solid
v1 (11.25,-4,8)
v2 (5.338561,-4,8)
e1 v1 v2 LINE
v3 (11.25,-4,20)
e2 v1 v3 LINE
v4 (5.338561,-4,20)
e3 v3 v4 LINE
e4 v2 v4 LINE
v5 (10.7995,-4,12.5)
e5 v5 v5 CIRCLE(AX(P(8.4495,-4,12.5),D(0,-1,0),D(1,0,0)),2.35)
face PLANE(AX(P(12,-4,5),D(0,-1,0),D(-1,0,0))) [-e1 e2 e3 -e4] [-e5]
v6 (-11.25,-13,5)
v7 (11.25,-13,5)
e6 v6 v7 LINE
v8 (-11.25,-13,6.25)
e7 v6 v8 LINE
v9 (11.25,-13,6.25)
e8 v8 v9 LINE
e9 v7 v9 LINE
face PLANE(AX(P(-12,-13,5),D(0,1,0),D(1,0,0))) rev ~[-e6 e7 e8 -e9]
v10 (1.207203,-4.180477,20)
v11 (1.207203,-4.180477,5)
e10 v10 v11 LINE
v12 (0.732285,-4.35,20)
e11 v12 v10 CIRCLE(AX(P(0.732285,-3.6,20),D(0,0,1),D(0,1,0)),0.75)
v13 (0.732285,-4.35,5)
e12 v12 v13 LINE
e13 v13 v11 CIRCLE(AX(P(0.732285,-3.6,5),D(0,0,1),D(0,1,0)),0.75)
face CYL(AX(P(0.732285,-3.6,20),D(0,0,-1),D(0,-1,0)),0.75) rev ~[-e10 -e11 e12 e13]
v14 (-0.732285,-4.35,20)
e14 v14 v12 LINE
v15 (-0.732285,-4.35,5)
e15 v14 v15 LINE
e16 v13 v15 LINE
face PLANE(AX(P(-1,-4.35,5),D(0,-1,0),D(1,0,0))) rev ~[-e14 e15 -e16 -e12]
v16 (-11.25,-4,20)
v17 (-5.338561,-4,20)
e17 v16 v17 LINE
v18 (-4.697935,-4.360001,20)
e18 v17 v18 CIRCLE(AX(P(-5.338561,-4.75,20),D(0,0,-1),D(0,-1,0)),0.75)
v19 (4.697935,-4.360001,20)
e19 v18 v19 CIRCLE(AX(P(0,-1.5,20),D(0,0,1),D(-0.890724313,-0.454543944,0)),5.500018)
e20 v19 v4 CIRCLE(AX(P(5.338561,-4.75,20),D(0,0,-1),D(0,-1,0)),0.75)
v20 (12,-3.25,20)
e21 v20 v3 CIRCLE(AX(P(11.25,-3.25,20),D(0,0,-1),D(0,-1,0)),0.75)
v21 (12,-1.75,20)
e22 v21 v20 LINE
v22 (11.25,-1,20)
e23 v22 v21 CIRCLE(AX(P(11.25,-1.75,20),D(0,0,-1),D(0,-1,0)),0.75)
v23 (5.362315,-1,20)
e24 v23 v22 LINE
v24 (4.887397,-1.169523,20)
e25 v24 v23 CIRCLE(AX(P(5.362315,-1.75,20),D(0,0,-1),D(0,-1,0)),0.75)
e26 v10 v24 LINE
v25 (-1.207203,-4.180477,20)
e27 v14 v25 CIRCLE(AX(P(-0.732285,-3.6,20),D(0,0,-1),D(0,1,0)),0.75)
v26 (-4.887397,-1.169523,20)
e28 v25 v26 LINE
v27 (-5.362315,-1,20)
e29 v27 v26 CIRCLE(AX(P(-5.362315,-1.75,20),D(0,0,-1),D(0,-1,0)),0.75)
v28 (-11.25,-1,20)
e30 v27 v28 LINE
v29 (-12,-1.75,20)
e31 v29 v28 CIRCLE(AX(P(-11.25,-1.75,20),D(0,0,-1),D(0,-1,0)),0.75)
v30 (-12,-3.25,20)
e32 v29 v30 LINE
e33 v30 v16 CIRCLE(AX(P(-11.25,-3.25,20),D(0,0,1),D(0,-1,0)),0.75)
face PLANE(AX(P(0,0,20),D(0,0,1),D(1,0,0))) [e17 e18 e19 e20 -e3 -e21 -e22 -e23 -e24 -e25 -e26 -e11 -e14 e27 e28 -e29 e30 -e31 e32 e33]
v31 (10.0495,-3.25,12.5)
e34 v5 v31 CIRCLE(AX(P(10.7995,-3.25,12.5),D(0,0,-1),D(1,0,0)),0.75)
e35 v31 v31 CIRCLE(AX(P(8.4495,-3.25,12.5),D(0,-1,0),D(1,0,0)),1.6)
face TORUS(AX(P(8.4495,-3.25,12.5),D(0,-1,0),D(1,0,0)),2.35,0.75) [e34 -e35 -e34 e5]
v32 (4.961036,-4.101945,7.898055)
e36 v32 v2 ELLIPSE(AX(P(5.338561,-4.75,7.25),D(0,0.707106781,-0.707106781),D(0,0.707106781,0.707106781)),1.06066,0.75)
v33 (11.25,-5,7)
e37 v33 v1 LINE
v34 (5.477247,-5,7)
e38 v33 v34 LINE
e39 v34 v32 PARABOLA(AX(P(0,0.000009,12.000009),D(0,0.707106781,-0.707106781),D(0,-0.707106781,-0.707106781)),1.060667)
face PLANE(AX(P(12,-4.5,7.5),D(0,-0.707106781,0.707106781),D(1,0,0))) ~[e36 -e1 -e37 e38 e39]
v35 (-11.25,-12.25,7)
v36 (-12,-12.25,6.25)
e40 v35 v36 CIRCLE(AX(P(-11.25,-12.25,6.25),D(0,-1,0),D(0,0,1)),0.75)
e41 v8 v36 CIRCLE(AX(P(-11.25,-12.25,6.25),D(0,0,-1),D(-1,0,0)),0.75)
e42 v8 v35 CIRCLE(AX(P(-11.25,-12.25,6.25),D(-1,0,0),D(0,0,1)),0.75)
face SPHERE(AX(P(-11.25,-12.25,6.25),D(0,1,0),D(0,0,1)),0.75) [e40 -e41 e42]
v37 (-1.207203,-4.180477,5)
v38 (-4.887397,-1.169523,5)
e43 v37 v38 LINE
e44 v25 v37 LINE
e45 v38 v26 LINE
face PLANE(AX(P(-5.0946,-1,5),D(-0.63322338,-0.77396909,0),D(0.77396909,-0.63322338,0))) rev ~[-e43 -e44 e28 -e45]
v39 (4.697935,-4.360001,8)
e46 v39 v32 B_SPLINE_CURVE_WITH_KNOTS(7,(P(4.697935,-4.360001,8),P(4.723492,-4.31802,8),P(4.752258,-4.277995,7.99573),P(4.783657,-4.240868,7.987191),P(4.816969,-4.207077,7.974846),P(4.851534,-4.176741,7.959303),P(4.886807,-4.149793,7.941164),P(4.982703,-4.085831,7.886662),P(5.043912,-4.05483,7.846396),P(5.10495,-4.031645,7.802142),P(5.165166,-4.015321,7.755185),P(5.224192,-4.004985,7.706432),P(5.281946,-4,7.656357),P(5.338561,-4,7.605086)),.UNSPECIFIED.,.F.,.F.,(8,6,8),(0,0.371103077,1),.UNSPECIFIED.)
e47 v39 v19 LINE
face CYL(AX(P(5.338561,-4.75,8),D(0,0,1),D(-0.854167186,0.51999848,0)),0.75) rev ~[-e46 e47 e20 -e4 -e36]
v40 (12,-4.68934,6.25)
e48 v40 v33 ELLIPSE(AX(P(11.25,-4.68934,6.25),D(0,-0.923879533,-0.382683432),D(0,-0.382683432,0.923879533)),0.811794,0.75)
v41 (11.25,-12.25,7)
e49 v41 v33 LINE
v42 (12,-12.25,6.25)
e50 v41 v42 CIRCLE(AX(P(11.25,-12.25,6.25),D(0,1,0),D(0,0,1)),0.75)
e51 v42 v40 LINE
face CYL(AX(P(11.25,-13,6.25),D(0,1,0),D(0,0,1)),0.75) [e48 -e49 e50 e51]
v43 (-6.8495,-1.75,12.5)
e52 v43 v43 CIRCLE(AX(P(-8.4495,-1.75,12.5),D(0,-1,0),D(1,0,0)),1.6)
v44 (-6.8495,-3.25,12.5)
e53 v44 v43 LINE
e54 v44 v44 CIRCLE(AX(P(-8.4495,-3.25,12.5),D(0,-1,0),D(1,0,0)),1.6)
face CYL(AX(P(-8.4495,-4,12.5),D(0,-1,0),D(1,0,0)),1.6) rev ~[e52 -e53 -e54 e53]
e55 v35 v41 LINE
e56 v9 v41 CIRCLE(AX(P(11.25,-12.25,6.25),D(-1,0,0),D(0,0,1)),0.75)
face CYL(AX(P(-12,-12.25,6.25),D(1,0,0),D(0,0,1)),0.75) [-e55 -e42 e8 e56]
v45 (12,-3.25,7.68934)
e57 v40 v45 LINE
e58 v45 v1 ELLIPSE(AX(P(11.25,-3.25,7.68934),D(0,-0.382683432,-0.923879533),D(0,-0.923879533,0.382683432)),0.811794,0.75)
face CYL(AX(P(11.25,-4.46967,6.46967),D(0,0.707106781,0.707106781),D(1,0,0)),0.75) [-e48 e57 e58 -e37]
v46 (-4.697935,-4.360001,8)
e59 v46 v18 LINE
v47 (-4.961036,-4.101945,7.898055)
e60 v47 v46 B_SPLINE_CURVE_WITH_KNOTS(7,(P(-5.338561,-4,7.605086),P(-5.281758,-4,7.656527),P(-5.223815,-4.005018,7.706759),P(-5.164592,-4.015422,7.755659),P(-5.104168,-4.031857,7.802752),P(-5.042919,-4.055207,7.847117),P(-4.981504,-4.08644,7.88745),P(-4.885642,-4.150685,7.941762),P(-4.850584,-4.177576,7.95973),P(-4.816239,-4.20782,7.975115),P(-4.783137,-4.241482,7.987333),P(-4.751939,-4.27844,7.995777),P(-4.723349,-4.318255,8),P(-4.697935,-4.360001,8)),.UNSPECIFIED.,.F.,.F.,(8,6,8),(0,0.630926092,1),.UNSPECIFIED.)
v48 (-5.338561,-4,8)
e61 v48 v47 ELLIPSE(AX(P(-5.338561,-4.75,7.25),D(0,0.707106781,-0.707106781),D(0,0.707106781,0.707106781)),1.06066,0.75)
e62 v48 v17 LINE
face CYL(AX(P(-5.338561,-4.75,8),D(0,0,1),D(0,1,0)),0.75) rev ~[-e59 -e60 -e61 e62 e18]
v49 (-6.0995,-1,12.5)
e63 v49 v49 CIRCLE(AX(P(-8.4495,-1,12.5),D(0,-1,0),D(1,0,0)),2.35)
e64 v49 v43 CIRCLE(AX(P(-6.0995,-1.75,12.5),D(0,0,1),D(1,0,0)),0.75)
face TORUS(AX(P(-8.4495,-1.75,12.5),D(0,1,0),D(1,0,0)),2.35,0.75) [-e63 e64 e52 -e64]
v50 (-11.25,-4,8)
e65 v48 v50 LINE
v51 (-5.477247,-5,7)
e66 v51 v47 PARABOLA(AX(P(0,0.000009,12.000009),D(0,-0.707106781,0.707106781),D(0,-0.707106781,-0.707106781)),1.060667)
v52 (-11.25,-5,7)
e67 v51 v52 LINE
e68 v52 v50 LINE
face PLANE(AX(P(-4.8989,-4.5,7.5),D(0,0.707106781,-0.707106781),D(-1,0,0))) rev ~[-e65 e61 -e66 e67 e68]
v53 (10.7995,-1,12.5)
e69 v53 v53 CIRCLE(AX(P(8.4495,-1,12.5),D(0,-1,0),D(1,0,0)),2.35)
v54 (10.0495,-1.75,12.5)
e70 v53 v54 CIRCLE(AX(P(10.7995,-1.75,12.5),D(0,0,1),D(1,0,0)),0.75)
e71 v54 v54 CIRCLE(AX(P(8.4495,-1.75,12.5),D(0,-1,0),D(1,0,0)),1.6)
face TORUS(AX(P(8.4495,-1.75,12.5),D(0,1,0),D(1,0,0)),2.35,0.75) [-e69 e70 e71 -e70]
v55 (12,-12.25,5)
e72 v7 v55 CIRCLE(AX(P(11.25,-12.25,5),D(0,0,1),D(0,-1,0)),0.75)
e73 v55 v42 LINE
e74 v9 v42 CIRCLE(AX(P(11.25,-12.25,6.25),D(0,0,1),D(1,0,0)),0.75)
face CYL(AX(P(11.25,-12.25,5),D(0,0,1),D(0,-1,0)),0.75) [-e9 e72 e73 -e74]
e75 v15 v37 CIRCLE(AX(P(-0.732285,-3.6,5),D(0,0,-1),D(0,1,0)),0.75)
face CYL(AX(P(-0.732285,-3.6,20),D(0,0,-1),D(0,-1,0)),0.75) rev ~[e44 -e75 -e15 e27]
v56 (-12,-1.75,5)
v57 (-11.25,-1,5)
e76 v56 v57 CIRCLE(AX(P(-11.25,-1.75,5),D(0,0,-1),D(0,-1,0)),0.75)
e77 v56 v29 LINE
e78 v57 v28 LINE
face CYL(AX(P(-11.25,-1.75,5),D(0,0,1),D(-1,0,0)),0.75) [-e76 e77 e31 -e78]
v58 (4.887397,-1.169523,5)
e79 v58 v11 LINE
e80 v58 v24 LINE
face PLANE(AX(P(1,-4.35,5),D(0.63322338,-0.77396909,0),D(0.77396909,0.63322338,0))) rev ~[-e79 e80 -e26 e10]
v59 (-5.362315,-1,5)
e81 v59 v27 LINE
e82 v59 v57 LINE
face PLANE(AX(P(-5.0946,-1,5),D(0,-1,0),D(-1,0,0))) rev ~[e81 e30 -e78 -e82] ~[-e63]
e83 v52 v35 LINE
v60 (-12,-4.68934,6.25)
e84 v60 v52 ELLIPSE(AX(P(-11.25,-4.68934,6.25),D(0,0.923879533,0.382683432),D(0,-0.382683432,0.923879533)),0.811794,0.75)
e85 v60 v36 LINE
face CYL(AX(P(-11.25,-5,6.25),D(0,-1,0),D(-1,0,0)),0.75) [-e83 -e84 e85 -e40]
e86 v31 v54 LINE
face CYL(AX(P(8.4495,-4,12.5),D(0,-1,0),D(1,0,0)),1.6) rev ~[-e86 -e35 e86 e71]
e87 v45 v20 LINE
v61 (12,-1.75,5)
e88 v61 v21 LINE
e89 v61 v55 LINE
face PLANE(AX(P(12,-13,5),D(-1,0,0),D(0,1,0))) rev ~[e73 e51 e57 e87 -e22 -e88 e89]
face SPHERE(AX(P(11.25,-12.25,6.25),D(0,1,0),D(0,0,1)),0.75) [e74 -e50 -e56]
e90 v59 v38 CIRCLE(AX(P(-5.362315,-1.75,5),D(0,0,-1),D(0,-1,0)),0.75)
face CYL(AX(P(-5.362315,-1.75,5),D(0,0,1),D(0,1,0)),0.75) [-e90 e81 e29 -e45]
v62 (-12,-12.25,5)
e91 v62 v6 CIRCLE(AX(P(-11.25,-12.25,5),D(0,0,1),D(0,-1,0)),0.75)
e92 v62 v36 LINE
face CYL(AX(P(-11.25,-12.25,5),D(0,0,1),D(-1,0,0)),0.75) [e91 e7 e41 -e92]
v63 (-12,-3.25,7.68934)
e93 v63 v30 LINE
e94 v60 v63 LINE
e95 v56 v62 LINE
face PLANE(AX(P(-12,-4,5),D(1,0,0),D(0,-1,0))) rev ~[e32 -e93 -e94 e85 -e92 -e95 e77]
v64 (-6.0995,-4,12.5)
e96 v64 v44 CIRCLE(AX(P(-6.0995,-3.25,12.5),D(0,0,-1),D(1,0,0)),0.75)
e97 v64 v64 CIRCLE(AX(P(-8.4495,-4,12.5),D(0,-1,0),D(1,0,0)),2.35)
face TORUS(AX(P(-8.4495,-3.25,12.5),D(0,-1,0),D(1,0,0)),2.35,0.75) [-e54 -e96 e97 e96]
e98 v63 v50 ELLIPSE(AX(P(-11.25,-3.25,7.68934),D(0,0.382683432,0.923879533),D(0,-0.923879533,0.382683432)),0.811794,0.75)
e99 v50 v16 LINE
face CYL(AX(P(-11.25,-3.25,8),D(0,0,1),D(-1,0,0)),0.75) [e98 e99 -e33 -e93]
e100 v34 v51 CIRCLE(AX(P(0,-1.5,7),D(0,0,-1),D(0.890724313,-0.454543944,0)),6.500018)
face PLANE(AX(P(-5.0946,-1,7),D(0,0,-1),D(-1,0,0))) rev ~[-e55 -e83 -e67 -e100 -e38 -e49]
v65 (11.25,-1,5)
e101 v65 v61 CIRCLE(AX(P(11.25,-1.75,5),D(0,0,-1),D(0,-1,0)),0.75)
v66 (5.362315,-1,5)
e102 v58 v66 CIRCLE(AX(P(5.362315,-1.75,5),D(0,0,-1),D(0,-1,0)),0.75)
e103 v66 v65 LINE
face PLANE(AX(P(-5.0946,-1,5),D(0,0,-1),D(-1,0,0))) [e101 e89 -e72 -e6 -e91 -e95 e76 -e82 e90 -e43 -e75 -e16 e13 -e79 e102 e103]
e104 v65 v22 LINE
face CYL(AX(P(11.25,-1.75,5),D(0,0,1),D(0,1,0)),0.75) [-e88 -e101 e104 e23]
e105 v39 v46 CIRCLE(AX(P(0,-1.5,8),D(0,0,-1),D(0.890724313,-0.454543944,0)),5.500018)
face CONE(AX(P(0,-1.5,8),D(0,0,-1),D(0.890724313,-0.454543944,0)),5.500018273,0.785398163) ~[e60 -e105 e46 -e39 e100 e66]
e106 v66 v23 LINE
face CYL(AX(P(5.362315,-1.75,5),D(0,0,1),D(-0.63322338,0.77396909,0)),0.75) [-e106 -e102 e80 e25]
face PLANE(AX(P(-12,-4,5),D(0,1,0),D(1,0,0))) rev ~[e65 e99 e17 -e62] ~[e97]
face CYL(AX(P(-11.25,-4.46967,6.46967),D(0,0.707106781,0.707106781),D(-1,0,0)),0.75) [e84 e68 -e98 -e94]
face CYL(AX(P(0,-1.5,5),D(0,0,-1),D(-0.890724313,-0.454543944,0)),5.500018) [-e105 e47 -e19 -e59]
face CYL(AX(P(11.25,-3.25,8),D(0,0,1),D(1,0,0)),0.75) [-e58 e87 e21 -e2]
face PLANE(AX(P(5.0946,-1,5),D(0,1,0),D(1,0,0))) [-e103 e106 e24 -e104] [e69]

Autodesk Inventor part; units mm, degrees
ref_plane "YZ Plane" through (0, 0, 0) normal (1, 0, 0) x (0, 1, 0)
ref_plane "XZ Plane" through (0, 0, 0) normal (0, 1, 0) x (-1, 0, 0)
ref_plane "XY Plane" through (0, 0, 0) normal (0, 0, 1) x (1, 0, 0)
sketch "Sketch1" plane through (0, 0, 0) normal (0, 0, 1) x (1, 0, 0)
  line L0 (-10, -12.5) -> (10, -12.5) construction
  line L1 (10, -12.5) -> (10, 12.5) construction
  line L2 (10, 12.5) -> (-10, 12.5) construction
  line L3 (-10, 12.5) -> (-10, -12.5) construction
  line L4 (-10, -12.5) -> (10, 12.5) construction
  line L5 (10, -12.5) -> (-10, 12.5) construction
  circle A0 centre (-10, 12.5) radius 1.925
  circle A1 centre (10, 12.5) radius 1.925
  circle A2 centre (10, -12.5) radius 1.925
  circle A3 centre (-10, -12.5) radius 1.925
  arc A4 (-7.1685, 17.7046) -> (-15.1908, 9.6432) centre (-10, 12.5) ccw
  arc A5 (15.1908, 9.6432) -> (7.1685, 17.7046) centre (10, 12.5) ccw
  arc A6 (7.1685, -17.7046) -> (15.1908, -9.6432) centre (10, -12.5) ccw
  arc A7 (-15.1908, -9.6432) -> (-7.1685, -17.7046) centre (-10, -12.5) ccw
  arc A8 (-7.1685, 17.7046) -> (7.1685, 17.7046) centre (0, 30.8808) ccw
  arc A9 (7.1685, -17.7046) -> (-7.1685, -17.7046) centre (0, -30.8808) ccw
  arc A10 (15.1908, 9.6432) -> (15.1908, -9.6432) centre (32.7125, 0) ccw
  arc A11 (-15.1908, -9.6432) -> (-15.1908, 9.6432) centre (-32.7125, 0) ccw
  point P0 (0, 0)
  dimension "d0" = 25
  dimension "d1" = 20
  dimension "d2" = 3.85
  dimension "d3" = 4
  dimension "d4" = 15
  dimension "d5" = 20
extrude "Extrusion1" add sketch "Sketch1" along normal blind 5
sketch "Sketch2" plane through (0, 0, 5) normal (0, 0, 1) x (1, 0, 0)
  circle A0 centre (0, 0) radius 4 construction
  line L0 (-1, -4.35) -> (1, -4.35)
  line L1 (1, -4.35) -> (5.0946, -1)
  line L2 (5.0946, -1) -> (12, -1)
  line L3 (-1, -4.35) -> (-5.0946, -1)
  line L4 (-5.0946, -1) -> (-12, -1)
  line L5 (0, 0) -> (0, -4.35) construction
  line L6 (-12, -1) -> (-12, -4)
  line L7 (-12, -4) -> (-4.899, -4)
  line L8 (12, -1) -> (12, -4)
  line L9 (12, -4) -> (4.899, -4)
  arc A1 (-4.899, -4) -> (4.899, -4) centre (0, -1.5) ccw
  dimension "d8" = 8
  dimension "d9" = 1
  dimension "d10" = 3
  dimension "d11" = 24
  dimension "d12" = 2
  dimension "d13" = 3.35
  dimension "d14" = 5.5
  dimension "d15" = 2.5
extrude "Extrusion2" add sketch "Sketch2" along normal blind 15
sketch "Sketch3" plane through (4.899, -4, 5) normal (0, -1, 0) x (1, 0, 0)
  line L0 (7.101, 0) -> (0, 0) projected
  line L1 (7.101, 0) -> (7.101, 15) projected
  line L2 (0, 0) -> (0, 15) projected
  circle A0 centre (3.5505, 7.5) radius 1.6
  circle A1 centre (-13.3485, 7.5) radius 1.6
  line L3 (3.5505, 0) -> (3.5505, 7.5) construction
  line L4 (3.5505, 7.5) -> (7.101, 7.5) construction
  line L5 (-16.899, 7.5) -> (-13.3485, 7.5) construction
  line L6 (-13.3485, 7.5) -> (-13.3485, 0) construction
  line L7 (-16.899, 0) -> (-16.899, 15) projected
  point P0 (-4.899, -5)
  dimension "d18" = 3.2
extrude "Extrusion3" cut sketch "Sketch3" against normal blind 15
sketch "Sketch4" plane through (0, 0, 5) normal (0, 0, 1) x (1, 0, 0)
  line L0 (1, -4.35) -> (5.0946, -1) projected
  line L1 (-5.0946, -1) -> (-1, -4.35) projected
  line L2 (-1, -4.35) -> (1, -4.35) projected
  line L3 (-5.0946, -1) -> (-1, -4.35)
  line L4 (-1, -4.35) -> (1, -4.35)
  line L5 (1, -4.35) -> (5.0946, -1)
  line L6 (5.0946, 21.1209) -> (-5.0946, 21.1209)
  line L7 (-5.0946, 21.1209) -> (-5.0946, -1)
  line L8 (5.0946, -1) -> (5.0946, 21.1209)
  point P0 (0, 0)
extrude "Extrusion4" cut sketch "Sketch4" against normal blind 10
sketch "Sketch5" plane through (-12, -1, 20) normal (0, 1, 0) x (1, 0, 0)
  line L0 (0, 15) -> (6.9054, 15) projected
  line L1 (-11.2791, 15) -> (33.3469, 15)
  line L2 (33.3469, 15) -> (33.3469, 24.5778)
  line L3 (33.3469, 24.5778) -> (-11.2791, 24.5778)
  line L4 (-11.2791, 24.5778) -> (-11.2791, 15)
  point P0 (12, 20)
extrude "Extrusion5" cut sketch "Sketch5" against normal blind 25.875 and the other way blind 28.8125
sketch "Sketch6" plane through (-5.0946, -1, 5) normal (0, 0, -1) x (-1, 0, 0)
  line L0 (-10.1893, 0) -> (-6.0946, -3.35) projected
  line L1 (-10.1893, 0) -> (-17.0946, 0) projected
  line L2 (-17.0946, 0) -> (-17.0946, -3) projected
  line L3 (-17.0946, -3) -> (-9.9936, -3) projected
  arc A0 (-9.9936, -3) -> (-0.1957, -3) centre (-5.0946, -0.5) ccw projected
  line L4 (-0.1957, -3) -> (6.9054, -3) projected
  line L5 (6.9054, -3) -> (6.9054, 0) projected
  line L6 (6.9054, 0) -> (0, 0) projected
  line L7 (-4.0946, -3.35) -> (0, 0) projected
  line L8 (-6.0946, -3.35) -> (-4.0946, -3.35) projected
  line L9 (-17.0946, 0) -> (-10.1893, 0)
  line L10 (-6.0946, -3.35) -> (-10.1893, 0)
  line L11 (-6.0946, -3.35) -> (-4.0946, -3.35)
  line L12 (-4.0946, -3.35) -> (0, 0)
  line L13 (0, 0) -> (6.9054, 0)
  line L14 (6.9054, 0) -> (6.9054, -12)
  line L15 (6.9054, -12) -> (-17.0946, -12)
  line L16 (-17.0946, -12) -> (-17.0946, 0)
  point P0 (-5.0946, 1)
  dimension "d36" = 12
extrude "Extrusion6" add sketch "Sketch6" against normal blind 2 contours L3 A0 L4 L14 L15 L16
chamfer "Chamfer2" distance 1 angle 45 3 edges at (-8.4495, -4, 7) (0, -7, 7) (8.4495, -4, 7)
fillet "Fillet6" radius 0.75 21 edges at (12, -4, 14) (12, -1, 12.5) (-12, -4, 14) (-12, -1, 12.5) (-4.899, -4, 14) (4.899, -4, 14) (5.0946, -1, 12.5) (1, -4.35, 12.5) (-1, -4.35, 12.5) (-5.0946, -1, 12.5) (6.8495, -4, 12.5) (6.8495, -1, 12.5) (-10.0495, -4, 12.5) (-10.0495, -1, 12.5) (-12, -4.5, 7.5) (-12, -9, 7) (12, -4.5, 7.5) (12, -9, 7) (0, -13, 7) (12, -13, 6) (-12, -13, 6)
properties part number "rodClamp"
